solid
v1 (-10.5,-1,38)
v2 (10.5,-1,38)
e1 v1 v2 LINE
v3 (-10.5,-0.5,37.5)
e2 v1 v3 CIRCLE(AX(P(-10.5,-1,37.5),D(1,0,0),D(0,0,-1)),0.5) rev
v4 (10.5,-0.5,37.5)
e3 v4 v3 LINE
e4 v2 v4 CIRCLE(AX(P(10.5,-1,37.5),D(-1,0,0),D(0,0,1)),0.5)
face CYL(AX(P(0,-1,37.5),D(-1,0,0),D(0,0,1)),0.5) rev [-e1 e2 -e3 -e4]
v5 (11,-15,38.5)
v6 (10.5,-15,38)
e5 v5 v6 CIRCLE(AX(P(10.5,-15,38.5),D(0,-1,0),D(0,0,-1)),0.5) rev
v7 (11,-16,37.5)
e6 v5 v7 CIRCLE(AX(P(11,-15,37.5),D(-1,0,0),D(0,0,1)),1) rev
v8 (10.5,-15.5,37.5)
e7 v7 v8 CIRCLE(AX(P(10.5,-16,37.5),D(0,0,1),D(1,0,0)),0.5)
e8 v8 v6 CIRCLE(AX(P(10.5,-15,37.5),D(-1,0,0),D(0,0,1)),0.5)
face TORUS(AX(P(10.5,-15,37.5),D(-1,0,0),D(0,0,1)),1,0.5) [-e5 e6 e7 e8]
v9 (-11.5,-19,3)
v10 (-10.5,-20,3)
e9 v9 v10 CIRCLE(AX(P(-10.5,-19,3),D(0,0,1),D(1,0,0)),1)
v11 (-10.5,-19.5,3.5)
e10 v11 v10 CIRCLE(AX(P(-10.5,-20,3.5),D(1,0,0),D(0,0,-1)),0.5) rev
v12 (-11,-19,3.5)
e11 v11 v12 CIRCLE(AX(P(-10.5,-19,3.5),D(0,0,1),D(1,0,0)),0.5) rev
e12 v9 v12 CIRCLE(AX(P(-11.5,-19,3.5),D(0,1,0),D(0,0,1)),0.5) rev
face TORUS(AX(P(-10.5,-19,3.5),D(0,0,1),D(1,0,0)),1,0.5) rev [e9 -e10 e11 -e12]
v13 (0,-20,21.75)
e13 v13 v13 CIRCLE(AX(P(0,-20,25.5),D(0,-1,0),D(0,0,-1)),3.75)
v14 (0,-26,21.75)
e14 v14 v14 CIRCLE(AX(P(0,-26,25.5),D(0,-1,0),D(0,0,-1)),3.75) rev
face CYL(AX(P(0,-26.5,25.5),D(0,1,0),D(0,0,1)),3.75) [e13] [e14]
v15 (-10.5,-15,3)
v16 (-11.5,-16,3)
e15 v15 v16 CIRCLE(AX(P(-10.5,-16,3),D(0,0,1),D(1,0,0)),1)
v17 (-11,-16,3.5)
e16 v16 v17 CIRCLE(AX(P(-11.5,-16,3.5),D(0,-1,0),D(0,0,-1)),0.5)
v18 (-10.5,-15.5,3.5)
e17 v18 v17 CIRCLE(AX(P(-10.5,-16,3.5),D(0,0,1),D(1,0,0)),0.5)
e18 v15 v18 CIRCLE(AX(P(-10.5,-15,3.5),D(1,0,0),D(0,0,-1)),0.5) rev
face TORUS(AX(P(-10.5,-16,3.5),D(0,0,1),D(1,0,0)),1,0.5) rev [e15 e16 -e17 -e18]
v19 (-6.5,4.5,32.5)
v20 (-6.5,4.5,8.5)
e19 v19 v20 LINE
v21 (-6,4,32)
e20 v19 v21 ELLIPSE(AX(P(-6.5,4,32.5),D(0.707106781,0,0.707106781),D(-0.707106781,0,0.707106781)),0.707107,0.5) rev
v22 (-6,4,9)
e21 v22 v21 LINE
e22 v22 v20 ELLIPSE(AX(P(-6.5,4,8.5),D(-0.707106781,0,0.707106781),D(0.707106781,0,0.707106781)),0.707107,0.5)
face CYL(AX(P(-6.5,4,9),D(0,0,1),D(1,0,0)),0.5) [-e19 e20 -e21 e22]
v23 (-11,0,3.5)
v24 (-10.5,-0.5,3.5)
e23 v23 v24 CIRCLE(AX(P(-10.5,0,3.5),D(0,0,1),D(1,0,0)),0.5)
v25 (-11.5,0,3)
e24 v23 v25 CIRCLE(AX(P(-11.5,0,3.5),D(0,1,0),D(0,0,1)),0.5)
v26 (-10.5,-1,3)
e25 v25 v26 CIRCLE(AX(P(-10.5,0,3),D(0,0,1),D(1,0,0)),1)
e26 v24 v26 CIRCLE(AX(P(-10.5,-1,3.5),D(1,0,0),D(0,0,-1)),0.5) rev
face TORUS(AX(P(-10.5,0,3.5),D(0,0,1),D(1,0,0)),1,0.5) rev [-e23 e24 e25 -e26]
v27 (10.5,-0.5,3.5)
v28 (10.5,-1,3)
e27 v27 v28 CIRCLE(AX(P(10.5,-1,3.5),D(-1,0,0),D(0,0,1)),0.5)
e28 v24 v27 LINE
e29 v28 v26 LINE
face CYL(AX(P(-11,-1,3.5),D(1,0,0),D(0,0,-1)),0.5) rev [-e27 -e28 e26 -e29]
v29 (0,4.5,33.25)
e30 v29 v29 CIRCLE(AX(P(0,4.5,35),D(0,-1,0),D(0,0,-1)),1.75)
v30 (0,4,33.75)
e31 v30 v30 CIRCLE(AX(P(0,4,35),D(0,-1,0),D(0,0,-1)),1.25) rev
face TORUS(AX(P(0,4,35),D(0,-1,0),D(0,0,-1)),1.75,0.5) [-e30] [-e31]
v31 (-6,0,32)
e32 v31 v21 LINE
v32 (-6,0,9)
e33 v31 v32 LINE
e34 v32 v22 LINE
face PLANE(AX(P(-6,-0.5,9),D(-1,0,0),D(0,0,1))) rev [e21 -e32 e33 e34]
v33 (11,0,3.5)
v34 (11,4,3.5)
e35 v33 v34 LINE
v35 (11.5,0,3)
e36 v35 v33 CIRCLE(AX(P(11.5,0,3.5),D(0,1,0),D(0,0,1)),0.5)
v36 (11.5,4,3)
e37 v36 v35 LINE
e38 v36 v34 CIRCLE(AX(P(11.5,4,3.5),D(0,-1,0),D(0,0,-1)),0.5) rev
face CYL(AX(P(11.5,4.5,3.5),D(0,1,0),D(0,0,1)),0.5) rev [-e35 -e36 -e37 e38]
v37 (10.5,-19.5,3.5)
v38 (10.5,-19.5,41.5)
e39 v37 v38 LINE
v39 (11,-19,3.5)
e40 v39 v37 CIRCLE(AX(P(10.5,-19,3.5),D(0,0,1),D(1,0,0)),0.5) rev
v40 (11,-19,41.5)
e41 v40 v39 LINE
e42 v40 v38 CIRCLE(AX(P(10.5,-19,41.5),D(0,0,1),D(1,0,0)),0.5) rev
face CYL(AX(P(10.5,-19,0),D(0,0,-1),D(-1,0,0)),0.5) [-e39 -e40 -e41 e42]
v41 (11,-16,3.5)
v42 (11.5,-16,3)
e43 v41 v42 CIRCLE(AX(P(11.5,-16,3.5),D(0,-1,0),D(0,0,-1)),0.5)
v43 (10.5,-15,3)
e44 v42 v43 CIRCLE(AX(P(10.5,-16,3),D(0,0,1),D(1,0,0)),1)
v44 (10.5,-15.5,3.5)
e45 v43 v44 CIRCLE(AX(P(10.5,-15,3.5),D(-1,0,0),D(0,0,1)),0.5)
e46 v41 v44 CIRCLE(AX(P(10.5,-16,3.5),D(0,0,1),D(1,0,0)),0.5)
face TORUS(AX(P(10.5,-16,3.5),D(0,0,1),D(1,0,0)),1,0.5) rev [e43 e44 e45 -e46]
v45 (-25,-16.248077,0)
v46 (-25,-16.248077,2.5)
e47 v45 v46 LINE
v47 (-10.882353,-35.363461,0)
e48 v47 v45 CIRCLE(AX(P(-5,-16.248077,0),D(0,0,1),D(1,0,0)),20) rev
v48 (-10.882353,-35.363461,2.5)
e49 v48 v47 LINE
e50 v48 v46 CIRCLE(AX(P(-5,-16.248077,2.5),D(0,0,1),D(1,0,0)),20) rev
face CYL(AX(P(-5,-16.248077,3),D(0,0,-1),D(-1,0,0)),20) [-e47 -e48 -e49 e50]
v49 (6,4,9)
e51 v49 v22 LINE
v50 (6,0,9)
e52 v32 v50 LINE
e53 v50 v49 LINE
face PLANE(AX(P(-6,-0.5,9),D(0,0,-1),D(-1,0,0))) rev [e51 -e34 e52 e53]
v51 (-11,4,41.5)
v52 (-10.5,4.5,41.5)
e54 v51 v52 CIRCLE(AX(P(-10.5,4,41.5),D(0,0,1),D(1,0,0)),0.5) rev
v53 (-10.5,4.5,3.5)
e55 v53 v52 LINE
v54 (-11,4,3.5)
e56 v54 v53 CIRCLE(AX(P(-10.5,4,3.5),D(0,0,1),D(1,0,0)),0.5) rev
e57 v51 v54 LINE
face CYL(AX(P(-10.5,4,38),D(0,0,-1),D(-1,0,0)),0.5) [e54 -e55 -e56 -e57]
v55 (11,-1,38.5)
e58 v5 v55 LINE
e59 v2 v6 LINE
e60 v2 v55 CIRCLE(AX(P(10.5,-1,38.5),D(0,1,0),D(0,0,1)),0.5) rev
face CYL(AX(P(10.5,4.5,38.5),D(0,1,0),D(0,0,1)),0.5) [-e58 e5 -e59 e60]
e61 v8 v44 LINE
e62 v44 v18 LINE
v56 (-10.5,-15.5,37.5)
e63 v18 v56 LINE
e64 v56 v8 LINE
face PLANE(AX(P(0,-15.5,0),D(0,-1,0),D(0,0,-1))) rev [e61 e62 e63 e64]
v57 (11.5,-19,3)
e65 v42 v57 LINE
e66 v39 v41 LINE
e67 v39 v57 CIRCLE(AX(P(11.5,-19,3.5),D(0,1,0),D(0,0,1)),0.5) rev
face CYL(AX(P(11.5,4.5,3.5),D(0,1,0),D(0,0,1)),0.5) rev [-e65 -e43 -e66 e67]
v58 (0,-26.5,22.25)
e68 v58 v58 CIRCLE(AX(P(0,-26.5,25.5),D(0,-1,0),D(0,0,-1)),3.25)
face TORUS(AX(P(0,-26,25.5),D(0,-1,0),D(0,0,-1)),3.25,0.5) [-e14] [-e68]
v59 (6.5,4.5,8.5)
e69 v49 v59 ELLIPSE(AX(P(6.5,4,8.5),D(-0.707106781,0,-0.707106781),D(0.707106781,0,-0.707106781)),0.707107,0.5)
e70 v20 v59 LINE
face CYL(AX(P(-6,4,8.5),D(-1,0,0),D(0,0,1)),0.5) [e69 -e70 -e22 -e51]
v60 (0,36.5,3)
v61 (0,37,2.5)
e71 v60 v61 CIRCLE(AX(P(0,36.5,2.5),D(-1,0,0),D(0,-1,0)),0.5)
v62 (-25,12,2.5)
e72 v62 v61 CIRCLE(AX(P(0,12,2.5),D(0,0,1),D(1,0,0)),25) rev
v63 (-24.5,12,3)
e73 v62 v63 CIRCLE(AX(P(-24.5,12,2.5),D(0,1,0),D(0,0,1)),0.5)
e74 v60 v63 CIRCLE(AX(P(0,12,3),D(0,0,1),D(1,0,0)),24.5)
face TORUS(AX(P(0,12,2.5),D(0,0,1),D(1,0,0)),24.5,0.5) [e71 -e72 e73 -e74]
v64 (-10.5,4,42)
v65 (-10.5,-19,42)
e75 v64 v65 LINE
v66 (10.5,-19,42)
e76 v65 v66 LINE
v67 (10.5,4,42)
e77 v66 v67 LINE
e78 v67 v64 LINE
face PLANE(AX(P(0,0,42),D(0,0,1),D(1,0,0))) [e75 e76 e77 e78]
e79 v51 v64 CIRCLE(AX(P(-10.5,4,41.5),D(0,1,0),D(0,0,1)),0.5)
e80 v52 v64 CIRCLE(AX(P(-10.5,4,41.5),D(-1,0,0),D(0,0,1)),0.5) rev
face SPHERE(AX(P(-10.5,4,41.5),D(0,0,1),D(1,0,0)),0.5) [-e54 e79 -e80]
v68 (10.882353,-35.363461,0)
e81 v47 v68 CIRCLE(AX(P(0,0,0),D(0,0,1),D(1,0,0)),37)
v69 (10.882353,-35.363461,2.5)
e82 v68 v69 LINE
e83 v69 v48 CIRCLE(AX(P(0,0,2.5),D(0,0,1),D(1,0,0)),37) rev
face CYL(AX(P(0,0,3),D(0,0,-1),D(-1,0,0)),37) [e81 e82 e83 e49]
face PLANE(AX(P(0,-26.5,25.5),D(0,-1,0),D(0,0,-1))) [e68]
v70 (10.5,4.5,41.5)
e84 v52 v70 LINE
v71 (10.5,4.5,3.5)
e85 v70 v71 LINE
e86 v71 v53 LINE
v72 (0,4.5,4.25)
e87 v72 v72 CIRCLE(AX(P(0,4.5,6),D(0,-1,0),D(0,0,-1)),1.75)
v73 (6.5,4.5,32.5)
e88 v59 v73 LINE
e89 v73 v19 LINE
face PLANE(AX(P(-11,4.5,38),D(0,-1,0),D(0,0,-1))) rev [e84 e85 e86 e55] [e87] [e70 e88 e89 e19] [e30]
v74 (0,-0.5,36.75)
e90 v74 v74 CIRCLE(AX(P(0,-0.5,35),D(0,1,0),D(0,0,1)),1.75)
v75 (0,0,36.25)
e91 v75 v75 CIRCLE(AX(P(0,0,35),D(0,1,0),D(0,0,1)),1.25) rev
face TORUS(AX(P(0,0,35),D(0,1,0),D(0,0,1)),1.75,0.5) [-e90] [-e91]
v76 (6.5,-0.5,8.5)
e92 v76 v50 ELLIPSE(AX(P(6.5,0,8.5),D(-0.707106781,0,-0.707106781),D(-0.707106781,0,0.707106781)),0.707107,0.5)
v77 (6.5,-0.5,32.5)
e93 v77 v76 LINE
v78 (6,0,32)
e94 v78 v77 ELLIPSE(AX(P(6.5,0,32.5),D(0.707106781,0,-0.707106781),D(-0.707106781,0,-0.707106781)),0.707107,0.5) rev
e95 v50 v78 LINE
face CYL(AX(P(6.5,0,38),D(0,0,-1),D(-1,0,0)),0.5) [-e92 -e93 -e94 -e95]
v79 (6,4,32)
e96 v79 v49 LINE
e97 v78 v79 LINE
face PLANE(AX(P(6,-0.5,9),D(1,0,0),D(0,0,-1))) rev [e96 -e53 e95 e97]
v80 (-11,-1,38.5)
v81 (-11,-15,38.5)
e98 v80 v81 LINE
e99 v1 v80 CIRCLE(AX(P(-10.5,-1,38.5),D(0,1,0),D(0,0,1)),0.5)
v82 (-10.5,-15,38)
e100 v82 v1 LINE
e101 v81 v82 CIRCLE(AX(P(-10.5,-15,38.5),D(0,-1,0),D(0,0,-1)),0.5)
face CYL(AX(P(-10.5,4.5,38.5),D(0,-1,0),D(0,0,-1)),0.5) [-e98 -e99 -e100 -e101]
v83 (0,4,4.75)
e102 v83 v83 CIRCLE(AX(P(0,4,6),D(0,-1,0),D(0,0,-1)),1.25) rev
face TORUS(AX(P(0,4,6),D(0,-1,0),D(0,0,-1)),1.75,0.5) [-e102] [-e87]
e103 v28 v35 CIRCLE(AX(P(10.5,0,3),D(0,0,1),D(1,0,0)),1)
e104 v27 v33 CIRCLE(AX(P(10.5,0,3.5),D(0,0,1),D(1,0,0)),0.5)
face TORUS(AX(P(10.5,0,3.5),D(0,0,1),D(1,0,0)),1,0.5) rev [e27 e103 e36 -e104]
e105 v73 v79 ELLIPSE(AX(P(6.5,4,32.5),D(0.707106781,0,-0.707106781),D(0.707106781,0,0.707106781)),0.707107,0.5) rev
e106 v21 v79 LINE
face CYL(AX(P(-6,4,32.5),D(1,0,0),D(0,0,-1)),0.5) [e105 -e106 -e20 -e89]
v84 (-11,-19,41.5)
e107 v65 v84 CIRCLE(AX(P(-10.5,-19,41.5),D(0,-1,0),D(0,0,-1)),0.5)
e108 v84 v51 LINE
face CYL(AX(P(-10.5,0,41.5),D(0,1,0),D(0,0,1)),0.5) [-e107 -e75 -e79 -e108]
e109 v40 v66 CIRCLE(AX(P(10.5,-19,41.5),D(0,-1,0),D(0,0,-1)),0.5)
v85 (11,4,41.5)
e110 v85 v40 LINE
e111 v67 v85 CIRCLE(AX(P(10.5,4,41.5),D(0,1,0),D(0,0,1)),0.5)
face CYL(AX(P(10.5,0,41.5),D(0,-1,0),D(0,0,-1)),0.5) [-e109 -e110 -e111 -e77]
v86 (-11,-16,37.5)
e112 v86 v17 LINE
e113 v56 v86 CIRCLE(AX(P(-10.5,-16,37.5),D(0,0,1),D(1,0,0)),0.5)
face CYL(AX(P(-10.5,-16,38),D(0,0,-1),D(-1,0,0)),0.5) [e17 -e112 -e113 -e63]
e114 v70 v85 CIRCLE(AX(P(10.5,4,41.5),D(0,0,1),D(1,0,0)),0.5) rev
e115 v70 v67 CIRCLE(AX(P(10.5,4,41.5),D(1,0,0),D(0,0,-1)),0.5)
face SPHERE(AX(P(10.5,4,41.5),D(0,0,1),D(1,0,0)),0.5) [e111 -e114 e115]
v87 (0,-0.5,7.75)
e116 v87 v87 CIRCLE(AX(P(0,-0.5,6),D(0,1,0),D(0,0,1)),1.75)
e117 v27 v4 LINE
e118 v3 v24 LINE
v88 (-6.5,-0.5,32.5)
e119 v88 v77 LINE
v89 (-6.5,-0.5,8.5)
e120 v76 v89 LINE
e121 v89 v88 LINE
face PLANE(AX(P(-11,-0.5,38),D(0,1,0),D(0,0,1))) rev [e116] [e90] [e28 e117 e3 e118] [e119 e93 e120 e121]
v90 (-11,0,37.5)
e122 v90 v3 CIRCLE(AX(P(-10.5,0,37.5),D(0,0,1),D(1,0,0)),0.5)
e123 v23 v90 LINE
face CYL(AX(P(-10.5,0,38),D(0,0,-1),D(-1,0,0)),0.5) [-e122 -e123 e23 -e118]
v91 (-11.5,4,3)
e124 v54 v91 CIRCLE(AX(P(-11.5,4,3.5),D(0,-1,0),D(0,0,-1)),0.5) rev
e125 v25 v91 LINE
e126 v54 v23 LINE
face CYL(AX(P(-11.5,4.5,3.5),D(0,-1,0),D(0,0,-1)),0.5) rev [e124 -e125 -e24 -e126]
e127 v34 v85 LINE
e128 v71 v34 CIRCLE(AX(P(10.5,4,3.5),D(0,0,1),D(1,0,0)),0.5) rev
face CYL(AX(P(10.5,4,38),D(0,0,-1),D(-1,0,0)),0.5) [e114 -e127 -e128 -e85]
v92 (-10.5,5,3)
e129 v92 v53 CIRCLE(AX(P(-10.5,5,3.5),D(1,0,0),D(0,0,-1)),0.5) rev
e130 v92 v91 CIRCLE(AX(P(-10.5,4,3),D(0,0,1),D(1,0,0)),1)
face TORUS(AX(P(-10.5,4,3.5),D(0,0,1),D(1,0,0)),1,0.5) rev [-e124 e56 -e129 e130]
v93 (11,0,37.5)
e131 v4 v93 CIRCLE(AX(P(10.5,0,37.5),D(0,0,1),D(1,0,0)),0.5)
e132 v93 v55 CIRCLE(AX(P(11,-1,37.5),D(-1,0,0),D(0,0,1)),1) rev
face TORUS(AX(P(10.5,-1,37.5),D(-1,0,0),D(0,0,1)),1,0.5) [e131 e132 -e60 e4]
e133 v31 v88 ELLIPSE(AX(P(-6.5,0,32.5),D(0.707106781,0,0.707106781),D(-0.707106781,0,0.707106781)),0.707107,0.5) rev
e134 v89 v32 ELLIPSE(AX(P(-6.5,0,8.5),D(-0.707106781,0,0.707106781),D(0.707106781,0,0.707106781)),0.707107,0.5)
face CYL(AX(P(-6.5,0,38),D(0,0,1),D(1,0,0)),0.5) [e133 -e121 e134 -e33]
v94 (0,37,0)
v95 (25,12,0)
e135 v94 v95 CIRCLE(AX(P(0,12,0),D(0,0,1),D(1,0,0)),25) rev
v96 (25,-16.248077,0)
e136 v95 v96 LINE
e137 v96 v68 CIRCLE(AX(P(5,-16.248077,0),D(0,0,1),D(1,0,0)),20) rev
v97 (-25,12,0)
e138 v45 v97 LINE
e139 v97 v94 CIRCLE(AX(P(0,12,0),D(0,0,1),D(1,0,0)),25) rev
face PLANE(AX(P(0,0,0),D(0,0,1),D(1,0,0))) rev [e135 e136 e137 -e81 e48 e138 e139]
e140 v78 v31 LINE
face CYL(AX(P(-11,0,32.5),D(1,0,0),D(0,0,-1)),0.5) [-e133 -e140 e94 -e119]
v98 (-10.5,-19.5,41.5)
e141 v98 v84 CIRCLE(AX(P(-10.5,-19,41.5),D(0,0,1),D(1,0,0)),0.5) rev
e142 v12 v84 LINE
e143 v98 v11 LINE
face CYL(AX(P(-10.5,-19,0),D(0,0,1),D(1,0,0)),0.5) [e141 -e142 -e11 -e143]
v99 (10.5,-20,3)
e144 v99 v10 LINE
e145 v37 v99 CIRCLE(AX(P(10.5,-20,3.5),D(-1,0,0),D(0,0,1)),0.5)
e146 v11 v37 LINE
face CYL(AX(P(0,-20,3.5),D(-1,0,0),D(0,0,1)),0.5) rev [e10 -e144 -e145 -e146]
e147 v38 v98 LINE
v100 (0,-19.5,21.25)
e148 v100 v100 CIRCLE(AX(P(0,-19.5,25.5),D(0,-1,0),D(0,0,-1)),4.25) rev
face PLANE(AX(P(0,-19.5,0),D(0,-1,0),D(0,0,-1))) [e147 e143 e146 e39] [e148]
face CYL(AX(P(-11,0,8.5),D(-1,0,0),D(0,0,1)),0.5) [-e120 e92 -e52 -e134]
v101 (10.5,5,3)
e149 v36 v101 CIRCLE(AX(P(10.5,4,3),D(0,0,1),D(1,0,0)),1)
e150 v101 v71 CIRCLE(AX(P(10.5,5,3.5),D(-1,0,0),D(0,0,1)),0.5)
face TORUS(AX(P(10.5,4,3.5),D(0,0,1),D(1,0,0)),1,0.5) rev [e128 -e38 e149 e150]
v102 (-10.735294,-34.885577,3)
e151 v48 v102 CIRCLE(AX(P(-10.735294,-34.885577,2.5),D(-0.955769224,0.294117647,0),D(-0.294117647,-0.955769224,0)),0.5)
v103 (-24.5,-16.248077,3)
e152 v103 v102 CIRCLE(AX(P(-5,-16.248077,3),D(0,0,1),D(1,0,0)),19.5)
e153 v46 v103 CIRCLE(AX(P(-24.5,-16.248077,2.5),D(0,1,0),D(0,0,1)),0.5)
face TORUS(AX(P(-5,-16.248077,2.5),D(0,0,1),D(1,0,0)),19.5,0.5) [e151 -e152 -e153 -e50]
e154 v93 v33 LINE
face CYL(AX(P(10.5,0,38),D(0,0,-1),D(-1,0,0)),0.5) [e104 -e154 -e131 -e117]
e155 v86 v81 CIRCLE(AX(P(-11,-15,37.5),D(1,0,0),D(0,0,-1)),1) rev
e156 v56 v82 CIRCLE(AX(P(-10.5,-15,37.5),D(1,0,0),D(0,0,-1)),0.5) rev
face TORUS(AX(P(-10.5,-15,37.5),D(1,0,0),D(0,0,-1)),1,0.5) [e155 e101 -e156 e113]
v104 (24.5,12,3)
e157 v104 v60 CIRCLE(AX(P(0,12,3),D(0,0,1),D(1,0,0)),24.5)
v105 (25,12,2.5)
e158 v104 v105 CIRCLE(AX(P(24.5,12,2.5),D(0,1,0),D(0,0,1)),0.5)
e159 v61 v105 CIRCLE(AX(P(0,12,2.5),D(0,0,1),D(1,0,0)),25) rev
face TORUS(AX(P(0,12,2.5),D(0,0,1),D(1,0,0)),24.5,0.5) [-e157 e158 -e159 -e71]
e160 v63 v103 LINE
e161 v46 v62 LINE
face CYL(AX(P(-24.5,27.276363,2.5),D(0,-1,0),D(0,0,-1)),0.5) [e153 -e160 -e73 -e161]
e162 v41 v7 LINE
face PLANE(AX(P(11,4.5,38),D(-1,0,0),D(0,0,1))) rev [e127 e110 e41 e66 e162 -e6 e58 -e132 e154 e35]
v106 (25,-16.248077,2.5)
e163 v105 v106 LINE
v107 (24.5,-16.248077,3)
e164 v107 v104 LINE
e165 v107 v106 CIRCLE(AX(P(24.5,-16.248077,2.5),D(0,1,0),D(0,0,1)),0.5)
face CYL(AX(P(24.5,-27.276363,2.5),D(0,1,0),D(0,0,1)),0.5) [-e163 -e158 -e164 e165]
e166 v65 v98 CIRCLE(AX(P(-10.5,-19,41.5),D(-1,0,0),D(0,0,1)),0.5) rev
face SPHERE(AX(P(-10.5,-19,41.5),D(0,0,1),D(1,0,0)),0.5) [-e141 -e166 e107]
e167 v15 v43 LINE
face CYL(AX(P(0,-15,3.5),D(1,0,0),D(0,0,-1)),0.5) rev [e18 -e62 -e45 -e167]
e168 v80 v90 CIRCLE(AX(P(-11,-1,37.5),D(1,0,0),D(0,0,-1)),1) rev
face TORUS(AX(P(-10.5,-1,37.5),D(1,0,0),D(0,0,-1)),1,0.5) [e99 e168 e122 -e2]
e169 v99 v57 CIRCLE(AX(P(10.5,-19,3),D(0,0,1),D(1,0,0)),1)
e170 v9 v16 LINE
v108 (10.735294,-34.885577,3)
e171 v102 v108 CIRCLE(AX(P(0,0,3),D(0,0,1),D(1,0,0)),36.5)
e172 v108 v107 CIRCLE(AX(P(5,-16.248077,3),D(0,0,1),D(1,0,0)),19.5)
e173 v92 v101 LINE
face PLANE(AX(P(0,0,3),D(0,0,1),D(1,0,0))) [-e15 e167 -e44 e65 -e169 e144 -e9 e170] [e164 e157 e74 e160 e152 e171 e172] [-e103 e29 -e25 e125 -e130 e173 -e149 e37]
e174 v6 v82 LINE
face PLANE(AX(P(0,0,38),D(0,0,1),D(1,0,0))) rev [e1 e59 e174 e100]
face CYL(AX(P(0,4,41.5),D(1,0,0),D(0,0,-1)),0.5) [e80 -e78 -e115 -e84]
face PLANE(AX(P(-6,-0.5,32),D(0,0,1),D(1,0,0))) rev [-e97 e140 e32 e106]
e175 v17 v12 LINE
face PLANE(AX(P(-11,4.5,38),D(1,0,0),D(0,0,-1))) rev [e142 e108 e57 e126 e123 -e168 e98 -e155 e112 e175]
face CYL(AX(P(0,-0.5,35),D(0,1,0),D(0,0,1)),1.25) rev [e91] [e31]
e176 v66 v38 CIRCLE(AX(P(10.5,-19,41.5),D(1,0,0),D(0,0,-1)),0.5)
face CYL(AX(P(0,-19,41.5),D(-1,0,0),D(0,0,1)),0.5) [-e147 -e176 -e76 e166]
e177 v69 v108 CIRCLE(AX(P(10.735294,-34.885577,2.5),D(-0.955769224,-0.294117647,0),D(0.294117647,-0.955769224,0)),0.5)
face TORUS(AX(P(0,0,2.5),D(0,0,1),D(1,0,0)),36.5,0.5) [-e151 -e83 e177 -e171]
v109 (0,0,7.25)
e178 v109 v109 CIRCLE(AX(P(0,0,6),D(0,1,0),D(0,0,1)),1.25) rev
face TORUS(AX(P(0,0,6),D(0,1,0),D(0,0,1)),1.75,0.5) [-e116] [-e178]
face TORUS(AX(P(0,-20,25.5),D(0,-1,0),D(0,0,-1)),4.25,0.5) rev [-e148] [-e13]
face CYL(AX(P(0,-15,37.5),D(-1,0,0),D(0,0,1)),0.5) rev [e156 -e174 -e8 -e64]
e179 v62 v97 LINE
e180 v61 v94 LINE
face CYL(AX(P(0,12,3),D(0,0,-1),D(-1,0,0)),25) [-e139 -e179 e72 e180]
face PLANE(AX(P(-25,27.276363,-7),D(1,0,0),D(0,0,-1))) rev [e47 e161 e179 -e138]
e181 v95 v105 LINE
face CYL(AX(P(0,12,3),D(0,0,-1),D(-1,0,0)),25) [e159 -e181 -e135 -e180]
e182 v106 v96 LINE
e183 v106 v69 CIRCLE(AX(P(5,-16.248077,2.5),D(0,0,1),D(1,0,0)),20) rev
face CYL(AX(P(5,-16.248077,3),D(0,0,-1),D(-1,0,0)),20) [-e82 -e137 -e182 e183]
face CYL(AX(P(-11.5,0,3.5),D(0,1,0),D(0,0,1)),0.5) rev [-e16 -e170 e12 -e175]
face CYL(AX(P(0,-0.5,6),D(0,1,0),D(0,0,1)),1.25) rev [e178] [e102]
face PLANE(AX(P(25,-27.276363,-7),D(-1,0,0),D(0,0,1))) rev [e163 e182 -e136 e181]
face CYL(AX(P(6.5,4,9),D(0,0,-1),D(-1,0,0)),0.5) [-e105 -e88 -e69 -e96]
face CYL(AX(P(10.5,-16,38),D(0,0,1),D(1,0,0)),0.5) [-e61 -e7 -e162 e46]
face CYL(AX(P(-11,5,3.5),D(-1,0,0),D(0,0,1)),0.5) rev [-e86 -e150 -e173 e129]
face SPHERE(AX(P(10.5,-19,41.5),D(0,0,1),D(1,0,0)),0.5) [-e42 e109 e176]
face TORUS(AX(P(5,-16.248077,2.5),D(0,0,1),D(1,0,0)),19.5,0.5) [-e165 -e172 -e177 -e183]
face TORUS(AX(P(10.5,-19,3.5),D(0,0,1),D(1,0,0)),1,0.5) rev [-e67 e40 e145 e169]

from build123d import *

# Parameters (mm, degrees)
SKETCH1_R           = 37
BOSS_EXTRUDE1_DEPTH = 3
CUT_EXTRUDE3_START  = -10
CUT_EXTRUDE3_DEPTH  = 10
FILLET1_R           = 25
FILLET2_R           = 20
SKETCH4_W           = 22
SKETCH4_H           = 5
BOSS_EXTRUDE2_DEPTH = 35
SKETCH5_W           = 12
SKETCH5_H           = 23
CUT_EXTRUDE1_DEPTH  = 5
SKETCH6_R           = 1.25
CUT_EXTRUDE2_DEPTH  = 5
SKETCH7_W           = 22
SKETCH7_H           = 20
BOSS_EXTRUDE3_DEPTH = 4
SKETCH8_W           = 22
SKETCH8_H           = 39
BOSS_EXTRUDE4_DEPTH = 4
SKETCH9_R           = 3.75
BOSS_EXTRUDE5_DEPTH = 7
FILLET3_R           = 0.5


with BuildPart() as part:
    # Sketch1 → Boss-Extrude1 (new body)
    with BuildSketch(Plane.XY):
        Circle(SKETCH1_R)
    extrude(amount=BOSS_EXTRUDE1_DEPTH)

    # Sketch10 → Cut-Extrude3 (cut)
    with BuildSketch(Plane.XY.offset(3).offset(CUT_EXTRUDE3_START)):
        with BuildLine():
            Line((-25, 27.276363394), (-25, -27.276363394))
            ThreePointArc((-25, -27.276363394), (-37, 0), (-25, 27.276363394))
        make_face()
        with BuildLine():
            Line((25, -27.276363394), (25, 27.276363394))
            ThreePointArc((25, 27.276363394), (37, 0), (25, -27.276363394))
        make_face()
    extrude(amount=CUT_EXTRUDE3_DEPTH, mode=Mode.SUBTRACT)

    # Fillet1
    fillet1_edges = [part.edges().sort_by_distance(p)[0] for p in [
        (-25, 27.276363394, 1.5),
        (25, 27.276363394, 1.5),
    ]]
    fillet(fillet1_edges, radius=FILLET1_R - 0.0001)  # a hair under: the kernel refuses the full size

    # Fillet2
    fillet2_edges = [part.edges().sort_by_distance(p)[0] for p in [
        (-25, -27.276363394, 1.5),
        (25, -27.276363394, 1.5),
    ]]
    fillet(fillet2_edges, radius=FILLET2_R)

    # Sketch4 → Boss-Extrude2 (add)
    with BuildSketch(Plane.XY.offset(3)):
        with Locations((0, 2)):
            Rectangle(SKETCH4_W, SKETCH4_H)
    extrude(amount=BOSS_EXTRUDE2_DEPTH)

    # Sketch5 → Cut-Extrude1 (cut)
    with BuildSketch(Plane(origin=(0, 4.5, 0), x_dir=(1, 0, 0), z_dir=(0, 1, 0))):
        with Locations((0, -20.5)):
            Rectangle(SKETCH5_W, SKETCH5_H)
    extrude(amount=-CUT_EXTRUDE1_DEPTH, mode=Mode.SUBTRACT)

    # Sketch6 → Cut-Extrude2 (cut)
    with BuildSketch(Plane(origin=(0, 4.5, 0), x_dir=(1, 0, 0), z_dir=(0, 1, 0))):
        with Locations(Location((0, -6, 0), (0, 0, 270))):
            Circle(SKETCH6_R)
        with Locations(Location((0, -35, 0), (0, 0, 270))):
            Circle(SKETCH6_R)
    extrude(amount=-CUT_EXTRUDE2_DEPTH, mode=Mode.SUBTRACT)

    # Sketch7 → Boss-Extrude3 (add)
    with BuildSketch(Plane.XY.offset(38)):
        with Locations((0, -5.5)):
            Rectangle(SKETCH7_W, SKETCH7_H)
    extrude(amount=BOSS_EXTRUDE3_DEPTH)

    # Sketch8 → Boss-Extrude4 (add)
    with BuildSketch(Plane.XZ.offset(15.5)):
        with Locations((0, 22.5)):
            Rectangle(SKETCH8_W, SKETCH8_H)
    extrude(amount=BOSS_EXTRUDE4_DEPTH)

    # Sketch9 → Boss-Extrude5 (add)
    with BuildSketch(Plane.XZ.offset(19.5)):
        with Locations(Location((0, 25.5, 0), (0, 0, 270))):
            Circle(SKETCH9_R)
    extrude(amount=BOSS_EXTRUDE5_DEPTH)

    # Fillet3
    fillet3_edges = [part.edges().sort_by_distance(p)[0] for p in [
        (-11, -15.5, 20.5),
        (0, -15.5, 3),
        (-11, -17.5, 3),
        (11, -15.5, 20.5),
        (11, -17.5, 3),
        (-11, -19.5, 22.5),
        (0, -19.5, 3),
        (11, -19.5, 22.5),
        (0, -19.5, 42),
        (0, -19.5, 29.25),
        (0, -26.5, 29.25),
        (25, -2.123988405, 3),
        (17.677772475, 29.677625162, 3),
        (-17.677772475, 29.677625162, 3),
        (-25, -2.123988405, 3),
        (0, -37, 3),
        (21.087993331, -28.129847325, 3),
        (-21.087993331, -28.129847325, 3),
        (11, 2, 3),
        (11, -0.5, 20.5),
        (0, 4.5, 3),
        (11, 4.5, 22.5),
        (-11, 2, 3),
        (-11, 4.5, 22.5),
        (0, -0.5, 3),
        (-11, -0.5, 20.5),
        (0, -0.5, 38),
        (6, -0.5, 20.5),
        (0, -0.5, 32),
        (-6, -0.5, 20.5),
        (0, -0.5, 9),
        (6, 4.5, 20.5),
        (0, 4.5, 9),
        (-6, 4.5, 20.5),
        (0, 4.5, 32),
        (0, -0.5, 4.75),
        (0, 4.5, 4.75),
        (0, -0.5, 33.75),
        (0, 4.5, 33.75),
        (-11, -8, 38),
        (0, -15.5, 38),
        (11, -8, 38),
        (-11, -7.5, 42),
        (11, -7.5, 42),
        (0, 4.5, 42),
    ]]
    fillet(fillet3_edges, radius=FILLET3_R)


solid = part.part
